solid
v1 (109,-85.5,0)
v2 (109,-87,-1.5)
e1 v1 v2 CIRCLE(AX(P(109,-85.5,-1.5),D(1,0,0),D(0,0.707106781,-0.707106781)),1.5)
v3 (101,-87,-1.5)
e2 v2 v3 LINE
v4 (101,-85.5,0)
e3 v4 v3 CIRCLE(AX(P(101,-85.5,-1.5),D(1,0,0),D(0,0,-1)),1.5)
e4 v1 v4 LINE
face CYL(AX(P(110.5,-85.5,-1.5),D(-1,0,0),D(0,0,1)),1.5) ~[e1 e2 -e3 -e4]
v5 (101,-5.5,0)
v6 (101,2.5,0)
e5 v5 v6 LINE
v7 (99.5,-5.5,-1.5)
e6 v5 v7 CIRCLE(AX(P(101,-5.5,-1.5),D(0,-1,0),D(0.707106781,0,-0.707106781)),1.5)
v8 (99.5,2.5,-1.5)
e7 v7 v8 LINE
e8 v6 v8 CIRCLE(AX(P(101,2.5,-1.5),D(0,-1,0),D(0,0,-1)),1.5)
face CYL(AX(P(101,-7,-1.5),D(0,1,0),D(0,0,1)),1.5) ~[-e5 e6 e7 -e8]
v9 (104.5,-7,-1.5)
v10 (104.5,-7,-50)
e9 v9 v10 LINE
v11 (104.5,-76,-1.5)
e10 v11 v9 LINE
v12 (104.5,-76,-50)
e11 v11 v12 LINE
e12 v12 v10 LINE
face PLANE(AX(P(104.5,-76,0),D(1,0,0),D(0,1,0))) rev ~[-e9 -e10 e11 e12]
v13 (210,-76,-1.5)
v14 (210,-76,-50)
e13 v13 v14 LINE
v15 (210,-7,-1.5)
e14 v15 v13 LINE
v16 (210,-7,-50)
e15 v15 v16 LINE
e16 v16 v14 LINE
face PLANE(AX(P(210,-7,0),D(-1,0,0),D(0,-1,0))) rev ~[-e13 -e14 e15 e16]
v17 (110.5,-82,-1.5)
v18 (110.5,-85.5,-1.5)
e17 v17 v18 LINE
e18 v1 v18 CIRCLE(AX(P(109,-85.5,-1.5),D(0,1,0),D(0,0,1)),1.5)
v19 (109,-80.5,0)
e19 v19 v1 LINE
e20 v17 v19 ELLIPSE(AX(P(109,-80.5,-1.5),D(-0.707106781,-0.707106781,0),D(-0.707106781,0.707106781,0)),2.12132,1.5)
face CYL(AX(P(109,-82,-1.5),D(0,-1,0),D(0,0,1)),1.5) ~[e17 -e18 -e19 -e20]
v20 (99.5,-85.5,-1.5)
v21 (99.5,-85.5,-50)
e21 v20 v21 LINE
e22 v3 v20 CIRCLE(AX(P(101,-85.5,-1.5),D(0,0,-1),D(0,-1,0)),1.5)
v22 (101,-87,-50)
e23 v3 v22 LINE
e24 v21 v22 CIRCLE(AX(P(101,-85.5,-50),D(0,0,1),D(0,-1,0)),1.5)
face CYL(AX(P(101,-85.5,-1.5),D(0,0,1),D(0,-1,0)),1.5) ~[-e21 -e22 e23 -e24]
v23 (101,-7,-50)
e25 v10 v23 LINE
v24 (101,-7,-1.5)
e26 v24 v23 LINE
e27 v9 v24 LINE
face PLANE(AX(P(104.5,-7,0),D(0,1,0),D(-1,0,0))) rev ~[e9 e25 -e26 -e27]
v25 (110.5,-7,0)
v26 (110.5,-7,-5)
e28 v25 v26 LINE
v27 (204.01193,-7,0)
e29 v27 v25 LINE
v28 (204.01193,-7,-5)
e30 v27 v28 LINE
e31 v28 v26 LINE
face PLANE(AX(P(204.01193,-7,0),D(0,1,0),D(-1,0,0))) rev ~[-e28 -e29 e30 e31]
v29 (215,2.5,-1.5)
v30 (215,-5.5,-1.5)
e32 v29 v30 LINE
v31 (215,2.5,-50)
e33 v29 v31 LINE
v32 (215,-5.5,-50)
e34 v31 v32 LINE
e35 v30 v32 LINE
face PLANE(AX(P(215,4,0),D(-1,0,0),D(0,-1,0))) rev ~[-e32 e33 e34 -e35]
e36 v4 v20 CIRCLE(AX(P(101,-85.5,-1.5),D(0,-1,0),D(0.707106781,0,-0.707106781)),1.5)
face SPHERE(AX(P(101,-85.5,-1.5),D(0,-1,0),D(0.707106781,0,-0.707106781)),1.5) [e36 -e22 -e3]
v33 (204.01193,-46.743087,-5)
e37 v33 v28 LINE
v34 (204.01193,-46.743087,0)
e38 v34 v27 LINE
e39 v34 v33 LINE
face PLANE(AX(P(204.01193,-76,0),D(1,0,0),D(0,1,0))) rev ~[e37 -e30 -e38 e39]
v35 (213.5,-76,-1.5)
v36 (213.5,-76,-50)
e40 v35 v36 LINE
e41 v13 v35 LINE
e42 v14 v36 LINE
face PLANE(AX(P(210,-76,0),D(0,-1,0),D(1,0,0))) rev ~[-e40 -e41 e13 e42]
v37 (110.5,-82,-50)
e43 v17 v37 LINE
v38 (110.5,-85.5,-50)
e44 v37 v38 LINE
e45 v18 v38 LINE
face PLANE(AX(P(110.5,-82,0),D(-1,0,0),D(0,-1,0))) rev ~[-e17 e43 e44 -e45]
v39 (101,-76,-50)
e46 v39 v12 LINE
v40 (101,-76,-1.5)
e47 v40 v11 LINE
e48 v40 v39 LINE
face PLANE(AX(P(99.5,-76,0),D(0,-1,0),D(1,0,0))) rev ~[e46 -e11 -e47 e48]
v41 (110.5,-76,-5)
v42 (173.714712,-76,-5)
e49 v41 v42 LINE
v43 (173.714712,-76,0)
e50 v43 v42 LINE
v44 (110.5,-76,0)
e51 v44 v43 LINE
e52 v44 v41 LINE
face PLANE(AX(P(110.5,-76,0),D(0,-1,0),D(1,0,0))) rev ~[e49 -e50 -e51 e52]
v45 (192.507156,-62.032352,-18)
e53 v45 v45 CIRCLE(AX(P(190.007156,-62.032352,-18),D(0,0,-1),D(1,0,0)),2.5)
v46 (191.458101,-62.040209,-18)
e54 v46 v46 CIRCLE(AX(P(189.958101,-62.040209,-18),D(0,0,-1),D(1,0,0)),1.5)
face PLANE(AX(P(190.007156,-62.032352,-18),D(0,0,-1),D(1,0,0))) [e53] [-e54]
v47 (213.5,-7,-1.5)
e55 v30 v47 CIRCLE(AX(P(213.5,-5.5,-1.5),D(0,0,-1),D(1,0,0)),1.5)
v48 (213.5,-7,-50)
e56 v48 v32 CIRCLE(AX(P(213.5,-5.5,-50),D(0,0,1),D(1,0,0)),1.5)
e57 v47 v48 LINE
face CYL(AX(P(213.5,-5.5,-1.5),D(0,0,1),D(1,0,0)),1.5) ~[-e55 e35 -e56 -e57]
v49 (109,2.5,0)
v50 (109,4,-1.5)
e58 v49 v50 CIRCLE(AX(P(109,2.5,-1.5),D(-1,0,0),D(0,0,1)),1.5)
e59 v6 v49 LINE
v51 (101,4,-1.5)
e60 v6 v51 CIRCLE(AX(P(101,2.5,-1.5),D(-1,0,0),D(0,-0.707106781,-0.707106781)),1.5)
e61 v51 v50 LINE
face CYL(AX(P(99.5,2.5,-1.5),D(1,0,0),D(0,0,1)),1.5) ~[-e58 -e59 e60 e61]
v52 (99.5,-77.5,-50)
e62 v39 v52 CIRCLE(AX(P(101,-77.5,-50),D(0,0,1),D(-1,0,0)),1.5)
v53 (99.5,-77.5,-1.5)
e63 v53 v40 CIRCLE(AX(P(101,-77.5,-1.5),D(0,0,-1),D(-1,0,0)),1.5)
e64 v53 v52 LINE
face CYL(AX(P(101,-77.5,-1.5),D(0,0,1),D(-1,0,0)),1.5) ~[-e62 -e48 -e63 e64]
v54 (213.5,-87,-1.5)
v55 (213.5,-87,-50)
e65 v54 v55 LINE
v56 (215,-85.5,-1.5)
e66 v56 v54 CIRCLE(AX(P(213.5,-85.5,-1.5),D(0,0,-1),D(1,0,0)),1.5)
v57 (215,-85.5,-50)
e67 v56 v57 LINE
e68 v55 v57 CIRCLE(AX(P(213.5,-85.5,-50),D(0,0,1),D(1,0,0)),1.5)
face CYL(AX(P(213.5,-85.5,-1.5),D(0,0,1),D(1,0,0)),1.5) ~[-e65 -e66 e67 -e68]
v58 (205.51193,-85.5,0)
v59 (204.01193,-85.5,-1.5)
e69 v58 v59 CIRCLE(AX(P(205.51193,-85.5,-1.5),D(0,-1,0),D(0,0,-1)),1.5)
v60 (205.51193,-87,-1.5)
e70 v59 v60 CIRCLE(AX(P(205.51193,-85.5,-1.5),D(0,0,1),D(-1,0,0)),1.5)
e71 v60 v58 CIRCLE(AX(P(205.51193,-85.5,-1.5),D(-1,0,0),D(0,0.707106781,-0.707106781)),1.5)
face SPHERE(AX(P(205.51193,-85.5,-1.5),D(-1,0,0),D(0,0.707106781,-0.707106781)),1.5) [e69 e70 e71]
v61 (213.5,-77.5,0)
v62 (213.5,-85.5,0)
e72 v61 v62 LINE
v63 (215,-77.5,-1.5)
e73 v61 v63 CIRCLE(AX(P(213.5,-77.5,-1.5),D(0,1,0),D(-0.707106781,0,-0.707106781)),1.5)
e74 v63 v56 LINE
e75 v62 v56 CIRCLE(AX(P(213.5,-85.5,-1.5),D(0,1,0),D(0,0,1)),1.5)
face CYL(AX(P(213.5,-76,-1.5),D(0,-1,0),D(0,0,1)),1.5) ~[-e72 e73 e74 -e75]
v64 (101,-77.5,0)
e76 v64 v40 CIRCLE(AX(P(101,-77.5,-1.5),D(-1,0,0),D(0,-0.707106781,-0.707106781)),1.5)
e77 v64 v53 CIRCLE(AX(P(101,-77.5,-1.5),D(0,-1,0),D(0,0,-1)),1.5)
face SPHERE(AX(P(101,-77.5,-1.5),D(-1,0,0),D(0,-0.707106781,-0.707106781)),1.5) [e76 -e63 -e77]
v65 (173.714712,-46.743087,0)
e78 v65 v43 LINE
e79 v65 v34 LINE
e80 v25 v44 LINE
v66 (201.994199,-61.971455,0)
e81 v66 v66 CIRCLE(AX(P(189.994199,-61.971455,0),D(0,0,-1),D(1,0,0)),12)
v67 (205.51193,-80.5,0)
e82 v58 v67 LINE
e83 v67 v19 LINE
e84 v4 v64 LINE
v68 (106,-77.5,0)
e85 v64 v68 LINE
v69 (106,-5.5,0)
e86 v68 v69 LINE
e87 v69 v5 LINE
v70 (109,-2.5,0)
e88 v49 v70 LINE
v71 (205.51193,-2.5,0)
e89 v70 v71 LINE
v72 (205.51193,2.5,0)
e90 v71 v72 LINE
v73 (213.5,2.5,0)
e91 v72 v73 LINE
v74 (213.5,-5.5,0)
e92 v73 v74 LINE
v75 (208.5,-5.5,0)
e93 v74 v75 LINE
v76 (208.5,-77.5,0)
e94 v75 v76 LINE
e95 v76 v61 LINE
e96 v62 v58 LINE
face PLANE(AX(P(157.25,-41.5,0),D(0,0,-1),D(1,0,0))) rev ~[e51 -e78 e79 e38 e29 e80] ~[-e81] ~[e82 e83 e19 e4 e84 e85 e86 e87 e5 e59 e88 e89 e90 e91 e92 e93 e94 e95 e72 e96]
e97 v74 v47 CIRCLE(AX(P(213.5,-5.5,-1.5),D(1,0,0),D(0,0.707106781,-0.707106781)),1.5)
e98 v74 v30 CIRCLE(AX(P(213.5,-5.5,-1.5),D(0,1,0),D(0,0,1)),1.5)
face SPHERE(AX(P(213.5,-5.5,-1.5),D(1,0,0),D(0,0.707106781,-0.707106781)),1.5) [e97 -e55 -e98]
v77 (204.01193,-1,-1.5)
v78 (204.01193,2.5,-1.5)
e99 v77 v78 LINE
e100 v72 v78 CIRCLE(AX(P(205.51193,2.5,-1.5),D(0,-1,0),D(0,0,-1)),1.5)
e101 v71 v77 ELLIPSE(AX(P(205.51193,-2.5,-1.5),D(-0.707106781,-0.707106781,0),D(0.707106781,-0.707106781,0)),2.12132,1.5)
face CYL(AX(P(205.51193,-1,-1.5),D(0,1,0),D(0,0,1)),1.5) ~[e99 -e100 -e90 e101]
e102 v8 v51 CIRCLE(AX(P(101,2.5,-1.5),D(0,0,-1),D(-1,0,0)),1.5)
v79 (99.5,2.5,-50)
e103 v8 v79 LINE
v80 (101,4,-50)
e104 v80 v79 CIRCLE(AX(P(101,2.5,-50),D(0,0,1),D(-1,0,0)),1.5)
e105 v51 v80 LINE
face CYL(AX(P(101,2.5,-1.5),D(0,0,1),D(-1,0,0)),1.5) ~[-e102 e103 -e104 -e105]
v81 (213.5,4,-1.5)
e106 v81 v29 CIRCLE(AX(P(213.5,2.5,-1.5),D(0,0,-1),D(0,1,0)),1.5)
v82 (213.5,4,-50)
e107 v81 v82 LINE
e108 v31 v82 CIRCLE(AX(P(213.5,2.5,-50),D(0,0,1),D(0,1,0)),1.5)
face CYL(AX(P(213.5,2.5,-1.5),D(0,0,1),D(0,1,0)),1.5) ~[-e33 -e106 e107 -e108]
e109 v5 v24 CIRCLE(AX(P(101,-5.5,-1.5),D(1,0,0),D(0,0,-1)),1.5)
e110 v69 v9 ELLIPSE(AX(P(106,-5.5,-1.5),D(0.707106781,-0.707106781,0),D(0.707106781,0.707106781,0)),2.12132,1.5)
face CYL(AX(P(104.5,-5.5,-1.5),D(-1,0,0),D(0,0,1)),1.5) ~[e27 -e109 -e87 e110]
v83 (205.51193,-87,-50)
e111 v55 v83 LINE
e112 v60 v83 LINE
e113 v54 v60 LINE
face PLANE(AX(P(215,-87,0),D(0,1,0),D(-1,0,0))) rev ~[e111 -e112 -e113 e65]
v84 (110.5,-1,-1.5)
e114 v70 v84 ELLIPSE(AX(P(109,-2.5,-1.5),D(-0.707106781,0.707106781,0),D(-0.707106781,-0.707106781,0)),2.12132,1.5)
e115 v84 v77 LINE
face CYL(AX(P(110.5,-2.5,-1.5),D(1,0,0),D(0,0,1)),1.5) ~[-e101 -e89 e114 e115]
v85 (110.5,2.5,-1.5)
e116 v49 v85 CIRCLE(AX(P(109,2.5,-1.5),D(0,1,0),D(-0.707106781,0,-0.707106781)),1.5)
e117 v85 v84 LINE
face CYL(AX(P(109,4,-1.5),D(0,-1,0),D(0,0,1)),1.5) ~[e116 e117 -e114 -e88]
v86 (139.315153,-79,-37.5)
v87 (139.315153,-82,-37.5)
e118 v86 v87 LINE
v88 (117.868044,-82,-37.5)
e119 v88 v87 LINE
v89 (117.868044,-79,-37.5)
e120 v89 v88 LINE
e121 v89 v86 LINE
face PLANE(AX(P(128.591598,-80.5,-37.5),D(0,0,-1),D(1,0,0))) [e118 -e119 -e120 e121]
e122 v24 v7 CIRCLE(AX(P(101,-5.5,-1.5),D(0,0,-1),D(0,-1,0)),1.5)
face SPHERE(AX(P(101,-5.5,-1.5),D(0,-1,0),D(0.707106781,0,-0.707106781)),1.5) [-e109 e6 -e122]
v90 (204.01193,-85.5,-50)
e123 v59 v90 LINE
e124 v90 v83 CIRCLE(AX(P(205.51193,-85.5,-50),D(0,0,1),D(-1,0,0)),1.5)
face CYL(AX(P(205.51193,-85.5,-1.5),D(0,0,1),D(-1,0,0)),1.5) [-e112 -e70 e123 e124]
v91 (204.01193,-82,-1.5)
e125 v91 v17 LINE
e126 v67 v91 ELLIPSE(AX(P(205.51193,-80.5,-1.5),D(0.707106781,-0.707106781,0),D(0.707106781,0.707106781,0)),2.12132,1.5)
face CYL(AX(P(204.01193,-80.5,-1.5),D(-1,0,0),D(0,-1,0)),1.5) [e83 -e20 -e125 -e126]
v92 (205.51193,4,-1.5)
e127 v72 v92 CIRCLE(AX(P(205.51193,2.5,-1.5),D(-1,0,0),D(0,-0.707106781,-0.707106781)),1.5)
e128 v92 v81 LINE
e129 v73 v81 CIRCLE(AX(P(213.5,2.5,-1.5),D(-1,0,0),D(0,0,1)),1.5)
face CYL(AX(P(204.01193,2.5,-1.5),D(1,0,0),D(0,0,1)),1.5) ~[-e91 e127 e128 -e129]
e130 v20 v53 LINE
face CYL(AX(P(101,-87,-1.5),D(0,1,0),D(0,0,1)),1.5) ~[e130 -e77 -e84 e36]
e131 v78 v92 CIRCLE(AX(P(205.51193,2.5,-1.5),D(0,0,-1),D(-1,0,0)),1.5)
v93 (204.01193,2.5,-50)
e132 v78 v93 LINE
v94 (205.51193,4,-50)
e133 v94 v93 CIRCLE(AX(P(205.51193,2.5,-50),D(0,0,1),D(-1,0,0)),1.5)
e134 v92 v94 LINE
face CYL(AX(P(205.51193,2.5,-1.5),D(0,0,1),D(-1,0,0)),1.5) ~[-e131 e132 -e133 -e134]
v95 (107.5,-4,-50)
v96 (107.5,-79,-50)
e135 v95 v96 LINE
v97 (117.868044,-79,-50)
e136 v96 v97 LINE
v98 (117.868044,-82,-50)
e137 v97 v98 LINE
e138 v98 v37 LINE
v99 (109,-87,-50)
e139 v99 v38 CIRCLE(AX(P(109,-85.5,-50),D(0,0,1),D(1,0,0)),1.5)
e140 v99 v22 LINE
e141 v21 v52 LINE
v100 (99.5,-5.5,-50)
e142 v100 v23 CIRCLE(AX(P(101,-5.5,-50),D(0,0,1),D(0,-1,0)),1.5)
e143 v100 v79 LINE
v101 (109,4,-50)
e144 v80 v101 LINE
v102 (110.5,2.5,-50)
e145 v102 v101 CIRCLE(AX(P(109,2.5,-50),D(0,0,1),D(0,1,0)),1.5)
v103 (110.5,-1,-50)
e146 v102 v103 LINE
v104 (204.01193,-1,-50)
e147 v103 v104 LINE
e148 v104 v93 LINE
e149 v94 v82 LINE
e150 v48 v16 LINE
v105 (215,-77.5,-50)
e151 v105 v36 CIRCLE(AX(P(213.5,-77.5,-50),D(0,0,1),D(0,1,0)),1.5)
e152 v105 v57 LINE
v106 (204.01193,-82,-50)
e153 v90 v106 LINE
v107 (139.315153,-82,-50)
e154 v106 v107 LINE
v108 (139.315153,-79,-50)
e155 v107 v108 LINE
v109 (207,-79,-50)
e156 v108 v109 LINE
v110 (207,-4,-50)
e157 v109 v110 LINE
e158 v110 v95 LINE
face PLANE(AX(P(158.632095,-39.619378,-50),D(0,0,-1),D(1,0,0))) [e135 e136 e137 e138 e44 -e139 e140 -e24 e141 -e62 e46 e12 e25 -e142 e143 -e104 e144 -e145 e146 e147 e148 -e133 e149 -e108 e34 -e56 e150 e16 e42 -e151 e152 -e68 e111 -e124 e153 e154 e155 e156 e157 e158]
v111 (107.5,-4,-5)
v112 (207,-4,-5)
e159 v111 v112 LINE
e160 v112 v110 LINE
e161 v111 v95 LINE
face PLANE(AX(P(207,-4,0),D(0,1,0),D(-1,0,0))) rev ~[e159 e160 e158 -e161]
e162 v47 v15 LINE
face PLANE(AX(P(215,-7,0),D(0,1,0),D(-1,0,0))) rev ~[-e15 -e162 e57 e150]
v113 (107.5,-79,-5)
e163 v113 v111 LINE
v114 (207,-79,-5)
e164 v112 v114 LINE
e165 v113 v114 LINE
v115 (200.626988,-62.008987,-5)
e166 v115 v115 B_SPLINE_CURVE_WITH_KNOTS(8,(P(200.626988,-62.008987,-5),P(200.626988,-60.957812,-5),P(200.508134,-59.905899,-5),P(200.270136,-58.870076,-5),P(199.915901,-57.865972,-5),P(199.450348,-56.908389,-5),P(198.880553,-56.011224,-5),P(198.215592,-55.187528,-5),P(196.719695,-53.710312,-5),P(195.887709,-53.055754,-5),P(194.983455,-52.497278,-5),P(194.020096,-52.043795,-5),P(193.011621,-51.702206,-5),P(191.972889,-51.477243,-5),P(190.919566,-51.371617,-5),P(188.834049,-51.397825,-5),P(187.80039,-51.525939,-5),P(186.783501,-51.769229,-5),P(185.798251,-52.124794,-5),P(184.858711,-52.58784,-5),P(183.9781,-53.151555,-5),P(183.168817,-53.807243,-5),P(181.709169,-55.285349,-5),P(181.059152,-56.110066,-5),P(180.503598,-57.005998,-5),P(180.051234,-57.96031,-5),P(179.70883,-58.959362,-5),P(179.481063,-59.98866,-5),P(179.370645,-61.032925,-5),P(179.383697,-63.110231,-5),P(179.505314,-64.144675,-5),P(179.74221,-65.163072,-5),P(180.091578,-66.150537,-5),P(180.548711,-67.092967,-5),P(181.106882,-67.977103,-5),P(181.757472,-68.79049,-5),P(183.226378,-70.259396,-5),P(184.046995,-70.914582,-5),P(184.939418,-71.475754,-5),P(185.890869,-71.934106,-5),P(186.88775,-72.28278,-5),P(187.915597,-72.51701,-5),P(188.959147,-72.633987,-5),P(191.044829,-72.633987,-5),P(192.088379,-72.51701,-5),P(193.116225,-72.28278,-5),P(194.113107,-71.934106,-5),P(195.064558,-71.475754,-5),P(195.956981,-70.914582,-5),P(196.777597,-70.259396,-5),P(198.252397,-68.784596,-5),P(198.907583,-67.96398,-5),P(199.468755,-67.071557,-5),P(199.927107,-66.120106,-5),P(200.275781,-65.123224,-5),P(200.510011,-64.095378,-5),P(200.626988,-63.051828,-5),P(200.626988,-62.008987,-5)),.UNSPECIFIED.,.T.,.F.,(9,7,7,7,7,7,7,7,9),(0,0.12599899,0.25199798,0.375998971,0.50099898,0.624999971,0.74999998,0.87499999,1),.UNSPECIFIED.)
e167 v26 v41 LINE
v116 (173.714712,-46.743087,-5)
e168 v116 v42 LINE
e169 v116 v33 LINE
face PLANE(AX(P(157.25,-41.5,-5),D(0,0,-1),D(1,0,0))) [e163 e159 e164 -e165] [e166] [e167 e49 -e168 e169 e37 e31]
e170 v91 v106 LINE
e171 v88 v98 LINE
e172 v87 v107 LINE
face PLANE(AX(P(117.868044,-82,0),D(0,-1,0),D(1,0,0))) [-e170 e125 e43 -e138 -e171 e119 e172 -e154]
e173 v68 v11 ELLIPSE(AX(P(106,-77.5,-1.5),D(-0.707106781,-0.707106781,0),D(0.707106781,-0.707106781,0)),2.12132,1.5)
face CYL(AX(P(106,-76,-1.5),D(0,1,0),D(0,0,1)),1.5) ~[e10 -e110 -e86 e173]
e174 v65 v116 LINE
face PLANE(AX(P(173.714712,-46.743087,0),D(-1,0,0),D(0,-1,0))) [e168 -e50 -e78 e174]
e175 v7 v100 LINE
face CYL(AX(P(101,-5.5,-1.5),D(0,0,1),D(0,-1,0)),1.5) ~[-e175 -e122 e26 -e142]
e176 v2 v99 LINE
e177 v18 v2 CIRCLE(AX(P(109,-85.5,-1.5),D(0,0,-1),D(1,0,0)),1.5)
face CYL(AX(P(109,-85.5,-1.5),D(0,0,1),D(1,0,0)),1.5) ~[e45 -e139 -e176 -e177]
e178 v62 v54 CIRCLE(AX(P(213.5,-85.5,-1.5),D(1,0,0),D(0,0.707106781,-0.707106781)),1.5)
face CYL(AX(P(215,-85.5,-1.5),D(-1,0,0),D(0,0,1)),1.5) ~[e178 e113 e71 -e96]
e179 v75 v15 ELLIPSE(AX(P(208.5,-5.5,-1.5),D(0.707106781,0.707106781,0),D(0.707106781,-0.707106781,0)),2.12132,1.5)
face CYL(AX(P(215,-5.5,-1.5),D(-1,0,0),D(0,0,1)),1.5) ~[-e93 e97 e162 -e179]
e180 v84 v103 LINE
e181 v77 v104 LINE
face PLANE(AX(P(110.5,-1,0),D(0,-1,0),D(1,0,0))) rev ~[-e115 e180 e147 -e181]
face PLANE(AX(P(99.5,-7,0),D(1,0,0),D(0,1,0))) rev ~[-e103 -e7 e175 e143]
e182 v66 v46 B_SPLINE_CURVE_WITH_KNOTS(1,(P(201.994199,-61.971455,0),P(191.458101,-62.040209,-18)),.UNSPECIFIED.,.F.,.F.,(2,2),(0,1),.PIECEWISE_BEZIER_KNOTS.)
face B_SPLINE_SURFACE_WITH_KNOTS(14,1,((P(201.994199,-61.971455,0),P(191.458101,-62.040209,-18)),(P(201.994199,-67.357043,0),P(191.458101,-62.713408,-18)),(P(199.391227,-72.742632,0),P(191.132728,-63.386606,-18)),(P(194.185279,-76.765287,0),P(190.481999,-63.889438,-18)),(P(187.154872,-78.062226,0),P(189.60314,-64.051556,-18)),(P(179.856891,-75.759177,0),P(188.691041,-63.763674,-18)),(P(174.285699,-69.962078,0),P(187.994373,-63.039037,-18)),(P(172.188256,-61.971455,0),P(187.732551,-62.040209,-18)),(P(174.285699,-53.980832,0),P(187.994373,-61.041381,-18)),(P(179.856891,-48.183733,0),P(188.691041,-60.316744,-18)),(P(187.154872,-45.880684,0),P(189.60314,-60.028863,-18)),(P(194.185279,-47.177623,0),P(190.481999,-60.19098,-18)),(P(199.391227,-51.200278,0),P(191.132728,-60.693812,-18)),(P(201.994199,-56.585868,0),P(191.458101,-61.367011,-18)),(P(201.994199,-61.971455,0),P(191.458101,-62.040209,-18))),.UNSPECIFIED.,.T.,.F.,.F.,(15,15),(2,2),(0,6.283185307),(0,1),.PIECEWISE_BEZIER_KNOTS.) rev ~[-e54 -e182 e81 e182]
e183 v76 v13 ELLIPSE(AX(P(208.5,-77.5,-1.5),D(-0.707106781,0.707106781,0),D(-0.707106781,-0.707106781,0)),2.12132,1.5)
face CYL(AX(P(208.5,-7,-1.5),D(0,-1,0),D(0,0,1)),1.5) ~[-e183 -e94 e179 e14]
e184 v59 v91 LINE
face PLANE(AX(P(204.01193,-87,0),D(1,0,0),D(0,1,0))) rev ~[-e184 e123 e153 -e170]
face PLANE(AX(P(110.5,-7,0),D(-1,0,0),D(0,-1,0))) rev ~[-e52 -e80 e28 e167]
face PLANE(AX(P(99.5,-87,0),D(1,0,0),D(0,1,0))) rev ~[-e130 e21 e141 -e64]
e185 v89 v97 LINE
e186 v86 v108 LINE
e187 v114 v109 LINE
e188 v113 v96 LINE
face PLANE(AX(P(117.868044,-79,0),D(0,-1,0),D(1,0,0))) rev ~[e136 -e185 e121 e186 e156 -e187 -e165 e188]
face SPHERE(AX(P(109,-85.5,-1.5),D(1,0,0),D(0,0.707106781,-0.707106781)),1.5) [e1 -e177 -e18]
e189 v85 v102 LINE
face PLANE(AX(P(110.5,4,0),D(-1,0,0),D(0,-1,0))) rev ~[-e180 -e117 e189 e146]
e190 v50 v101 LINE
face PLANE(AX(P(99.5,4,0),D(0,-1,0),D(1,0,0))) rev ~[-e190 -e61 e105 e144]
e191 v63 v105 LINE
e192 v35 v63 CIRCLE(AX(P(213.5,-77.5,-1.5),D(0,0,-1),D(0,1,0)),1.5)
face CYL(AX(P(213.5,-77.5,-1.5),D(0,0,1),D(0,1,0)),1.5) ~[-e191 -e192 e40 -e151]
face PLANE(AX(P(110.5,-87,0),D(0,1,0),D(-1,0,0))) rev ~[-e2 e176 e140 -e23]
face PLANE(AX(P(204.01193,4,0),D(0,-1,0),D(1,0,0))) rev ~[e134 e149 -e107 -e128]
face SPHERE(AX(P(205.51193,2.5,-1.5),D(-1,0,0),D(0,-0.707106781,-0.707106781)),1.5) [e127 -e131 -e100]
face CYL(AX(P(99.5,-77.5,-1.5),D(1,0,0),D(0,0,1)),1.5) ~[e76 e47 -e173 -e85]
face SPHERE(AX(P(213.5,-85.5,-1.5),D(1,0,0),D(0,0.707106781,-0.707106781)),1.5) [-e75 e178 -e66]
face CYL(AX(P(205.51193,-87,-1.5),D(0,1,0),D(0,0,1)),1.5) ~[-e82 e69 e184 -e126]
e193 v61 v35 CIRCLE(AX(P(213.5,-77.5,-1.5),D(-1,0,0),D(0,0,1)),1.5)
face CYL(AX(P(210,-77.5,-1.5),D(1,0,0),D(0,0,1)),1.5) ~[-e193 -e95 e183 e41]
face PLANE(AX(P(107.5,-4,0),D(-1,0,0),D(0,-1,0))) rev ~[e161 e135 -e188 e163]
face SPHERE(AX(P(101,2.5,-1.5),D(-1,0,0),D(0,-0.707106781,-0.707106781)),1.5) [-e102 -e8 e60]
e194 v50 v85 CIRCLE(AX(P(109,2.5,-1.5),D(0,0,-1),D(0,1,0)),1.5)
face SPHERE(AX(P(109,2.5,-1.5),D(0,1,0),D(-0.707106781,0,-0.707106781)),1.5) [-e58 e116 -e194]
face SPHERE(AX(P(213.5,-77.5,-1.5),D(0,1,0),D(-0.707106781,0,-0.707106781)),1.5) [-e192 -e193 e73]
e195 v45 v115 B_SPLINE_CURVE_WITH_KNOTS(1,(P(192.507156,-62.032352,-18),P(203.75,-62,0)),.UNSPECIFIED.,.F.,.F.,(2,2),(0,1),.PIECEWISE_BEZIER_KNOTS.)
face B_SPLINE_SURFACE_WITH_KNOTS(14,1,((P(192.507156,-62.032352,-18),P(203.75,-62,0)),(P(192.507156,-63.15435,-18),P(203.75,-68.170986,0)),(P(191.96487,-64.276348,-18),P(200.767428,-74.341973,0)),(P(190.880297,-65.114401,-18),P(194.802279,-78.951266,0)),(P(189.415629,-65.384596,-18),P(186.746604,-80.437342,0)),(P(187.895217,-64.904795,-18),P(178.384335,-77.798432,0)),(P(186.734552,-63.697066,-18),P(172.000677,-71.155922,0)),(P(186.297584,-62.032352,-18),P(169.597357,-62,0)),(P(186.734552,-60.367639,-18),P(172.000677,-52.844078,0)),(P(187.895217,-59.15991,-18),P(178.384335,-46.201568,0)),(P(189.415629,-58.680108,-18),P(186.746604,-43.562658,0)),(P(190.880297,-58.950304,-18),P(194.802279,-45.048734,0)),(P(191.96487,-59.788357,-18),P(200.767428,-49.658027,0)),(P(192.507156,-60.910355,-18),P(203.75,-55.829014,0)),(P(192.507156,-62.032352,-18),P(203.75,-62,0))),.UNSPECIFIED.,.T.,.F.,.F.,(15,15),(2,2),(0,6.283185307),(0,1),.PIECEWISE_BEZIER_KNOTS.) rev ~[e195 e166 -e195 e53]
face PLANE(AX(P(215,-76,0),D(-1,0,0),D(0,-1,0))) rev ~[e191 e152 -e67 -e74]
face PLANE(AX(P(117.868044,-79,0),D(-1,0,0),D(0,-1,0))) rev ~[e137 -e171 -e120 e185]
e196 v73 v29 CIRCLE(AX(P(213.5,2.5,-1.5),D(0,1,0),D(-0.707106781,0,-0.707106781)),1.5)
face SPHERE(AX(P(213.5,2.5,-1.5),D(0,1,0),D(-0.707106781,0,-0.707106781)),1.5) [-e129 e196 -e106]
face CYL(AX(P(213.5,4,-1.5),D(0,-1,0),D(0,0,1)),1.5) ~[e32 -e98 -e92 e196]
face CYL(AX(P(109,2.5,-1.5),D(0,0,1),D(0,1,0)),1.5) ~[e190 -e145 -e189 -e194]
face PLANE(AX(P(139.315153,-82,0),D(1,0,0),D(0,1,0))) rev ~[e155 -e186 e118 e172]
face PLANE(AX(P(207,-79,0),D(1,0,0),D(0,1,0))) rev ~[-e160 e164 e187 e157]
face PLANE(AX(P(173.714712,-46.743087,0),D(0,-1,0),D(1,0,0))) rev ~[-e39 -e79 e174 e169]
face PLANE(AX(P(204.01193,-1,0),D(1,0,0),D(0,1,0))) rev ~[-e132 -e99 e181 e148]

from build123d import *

# Parameters (mm, degrees)
F0_W          = 60.594435811
F0_H          = 58.5138263702
F0_R          = 27.5
F3_DEPTH      = 10
F4_R          = 5
F6_R          = 24
F7_R          = 3
F9_DEPTH      = 10
F10_DEPTH     = 100
F0_W_2        = 42.894218117
F0_H_2        = 6
F11_DEPTH     = 75
F12_R         = 3
F13_T1_DEPTH  = 104.5
F13_S5_W      = 3
F13_S5_H      = 3
F13_T6_DEPTH  = 3
F13_S11_W     = 3
F13_S11_H     = 3
F13_T12_DEPTH = 3
F13_S17_W     = 3
F13_S17_H     = 3
F13_T18_DEPTH = 3
F13_S23_W     = 3
F13_S23_H     = 3
F13_T24_DEPTH = 3
F13_S29_W     = 3
F13_S29_H     = 3
F13_T30_DEPTH = 3
F13_S35_W     = 3
F13_S35_H     = 3
F13_T36_DEPTH = 3
F13_S41_W     = 3
F13_S41_H     = 3
F13_T42_DEPTH = 3
F13_S47_W     = 3
F13_S47_H     = 3
F13_T48_DEPTH = 3
F13_S53_W     = 3
F13_S53_H     = 3
F13_T54_DEPTH = 3
F13_S59_W     = 3
F13_S59_H     = 3
F13_T60_DEPTH = 3
F13_S65_W     = 3
F13_S65_H     = 3
F13_T66_DEPTH = 3
F13_S71_W     = 3
F13_S71_H     = 3
F13_T72_DEPTH = 3
F14_SCALE     = 0.5
F15_ANGLE     = 180


# Not quite as in the source:
# - a fillet or chamfer that OpenCascade refuses, or shapes differently, is made with other operations: its cross-section is extruded or revolved along the edge and cut away or added


with BuildPart() as f3:
    # F0 (on Top) → F3 (new body)
    with BuildSketch(Plane.XY):
        with Locations((162.7266414762, 114.7430868149)):
            Rectangle(F0_W, F0_H)
        with Locations((165, 116)):
            Circle(F0_R, mode=Mode.SUBTRACT)
        with Locations((165, 116)):
            Circle(F0_R)
    extrude(amount=F3_DEPTH)

    # F4 (on offset) → F5 section 0
    with BuildSketch(Plane.XY.offset(36)):
        with Locations((165.0143116713, 116.0647049546)):
            Circle(F4_R)
    # F0 (on Top) → F5 section 1
    with BuildSketch(Plane.XY):
        with Locations((165, 116)):
            Circle(F0_R)
    loft()

    # F6 (on Top) → F8 section 0
    with BuildSketch(Plane.XY):
        with Locations((164.9883985519, 115.9429103136)):
            Circle(F6_R)
    # F7 (on offset) → F8 section 1
    with BuildSketch(Plane.XY.offset(36)):
        with Locations((164.916202426, 116.0804182291)):
            Circle(F7_R)
    loft(mode=Mode.SUBTRACT)

    # F0 (on Top) → F9 (join)
    with BuildSketch(Plane.XY):
        Polygon((0, 150), (0, 0), (199, 0), (199, 150), (63.6303052306, 150), (20.7360871136, 150), align=None)
        Polygon((193.0238593817, 6), (6, 6), (6, 144), (132.4294235706, 144), (193.0238593817, 144), (193.0238593817, 85.4861736298), align=None, mode=Mode.SUBTRACT)
    extrude(amount=F9_DEPTH)

    # F0 (on Top) → F10 (join)
    with BuildSketch(Plane.XY):
        Polygon((199, 0), (0, 0), (0, 150), (20.7360871136, 150), (20.7360871136, 156), (6, 156), (6, 166), (-16, 166), (-16, 144), (-6, 144), (-6, 6), (-16, 6), (-16, -16), (6, -16), (6, -6), (193.0238593817, -6), (193.0238593817, -16), (215, -16), (215, 6), (205, 6), (205, 144), (215, 144), (215, 166), (193.0238593817, 166), (193.0238593817, 156), (63.6303052306, 156), (63.6303052306, 150), (199, 150), align=None)
    extrude(amount=F10_DEPTH)

    # F0 (on Top) → F11 (join)
    with BuildSketch(Plane.XY):
        with Locations((42.1831961721, 153)):
            Rectangle(F0_W_2, F0_H_2)
    extrude(amount=F11_DEPTH)

    # F12
    f12_edges = [f3.edges().sort_by_distance(p)[0] for p in [
        (204.01193, -16, 0),
        (215, -5, 0),
        (205, 75, 0),
        (210, 6, 0),
        (210, 144, 0),
        (215, 155, 0),
        (204.01193, 166, 0),
        (193.023859, 161, 0),
        (99.51193, 156, 0),
        (-5, 166, 0),
        (6, 161, 0),
        (-16, 155, 0),
        (-11, 144, 0),
        (-6, 75, 0),
        (-11, 6, 0),
        (-5, -16, 0),
        (-16, -5, 0),
        (6, -11, 0),
        (99.51193, -6, 0),
        (193.023859, -11, 0),
    ]]
    fillet(f12_edges, radius=F12_R)

    # F13: fillet of radius 3 on 12 edges, made by hand

    # F13_s2 → F13_t1 (cut)
    with BuildSketch(Plane.XY.offset(3)):
        with BuildLine():
            ThreePointArc((212, -16), (214.1213203436, -15.1213203436), (215, -13))
            Line((215, -13), (215, -16))
            Line((215, -16), (212, -16))
        make_face()
        with BuildLine():
            ThreePointArc((193.0238593817, -13), (193.9025390381, -15.1213203436), (196.0238593817, -16))
            Line((196.0238593817, -16), (193.0238593817, -16))
            Line((193.0238593817, -16), (193.0238593817, -13))
        make_face()
        with BuildLine():
            ThreePointArc((215, 3), (214.1213203436, 5.1213203436), (212, 6))
            Line((212, 6), (215, 6))
            Line((215, 6), (215, 3))
        make_face()
        with BuildLine():
            ThreePointArc((212, 144), (214.1213203436, 144.8786796564), (215, 147))
            Line((215, 147), (215, 144))
            Line((215, 144), (212, 144))
        make_face()
        with BuildLine():
            ThreePointArc((215, 163), (214.1213203436, 165.1213203436), (212, 166))
            Line((212, 166), (215, 166))
            Line((215, 166), (215, 163))
        make_face()
        with BuildLine():
            ThreePointArc((193.0238593817, 163), (193.9025390381, 165.1213203436), (196.0238593817, 166))
            Line((196.0238593817, 166), (193.0238593817, 166))
            Line((193.0238593817, 166), (193.0238593817, 163))
        make_face()
        with BuildLine():
            ThreePointArc((3, -16), (5.1213203436, -15.1213203436), (6, -13))
            Line((6, -13), (6, -16))
            Line((6, -16), (3, -16))
        make_face()
        with BuildLine():
            ThreePointArc((-16, -13), (-15.1213203436, -15.1213203436), (-13, -16))
            Line((-13, -16), (-16, -16))
            Line((-16, -16), (-16, -13))
        make_face()
        with BuildLine():
            ThreePointArc((-13, 6), (-15.1213203436, 5.1213203436), (-16, 3))
            Line((-16, 3), (-16, 6))
            Line((-16, 6), (-13, 6))
        make_face()
        with BuildLine():
            ThreePointArc((-16, 147), (-15.1213203436, 144.8786796564), (-13, 144))
            Line((-13, 144), (-16, 144))
            Line((-16, 144), (-16, 147))
        make_face()
        with BuildLine():
            ThreePointArc((-13, 166), (-15.1213203436, 165.1213203436), (-16, 163))
            Line((-16, 163), (-16, 166))
            Line((-16, 166), (-13, 166))
        make_face()
        with BuildLine():
            ThreePointArc((6, 163), (5.1213203436, 165.1213203436), (3, 166))
            Line((3, 166), (6, 166))
            Line((6, 166), (6, 163))
        make_face()
    extrude(amount=F13_T1_DEPTH, mode=Mode.SUBTRACT)


with BuildPart() as f13_tool4:
    # F13_s5 → F13_t6 (new body)
    with BuildSketch(Plane.YZ.offset(3)):
        with Locations((164.5, 1.5)):
            Rectangle(F13_S5_W, F13_S5_H)
    extrude(amount=F13_T6_DEPTH)

    # F13_s7 → F13_t8 (revolve, cut)
    with BuildSketch(Plane(origin=(3, 163, 3), x_dir=(0, -0.7071067812, 0.7071067812), z_dir=(0, 0.7071067812, 0.7071067812))):
        with BuildLine():
            ThreePointArc((0, -3), (3, 0), (0, 3))
            Line((0, 3), (0, -3))
        make_face()
    revolve(axis=Axis((3, 163, 3), (1, 0, 0)), mode=Mode.SUBTRACT)


with BuildPart() as f3_1:
    add(f3.part)

    # F13_t3: cut F13_tool4
    add(f13_tool4.part, mode=Mode.SUBTRACT)


with BuildPart() as f13_tool10:
    # F13_s11 → F13_t12 (new body)
    with BuildSketch(Plane.XZ.offset(-163)):
        with Locations((-14.5, 1.5)):
            Rectangle(F13_S11_W, F13_S11_H)
    extrude(amount=-F13_T12_DEPTH)

    # F13_s13 → F13_t14 (revolve, cut)
    with BuildSketch(Plane(origin=(-13, 163, 3), x_dir=(0.7071067812, 0, 0.7071067812), z_dir=(-0.7071067812, 0, 0.7071067812))):
        with BuildLine():
            ThreePointArc((0, -3), (3, 0), (0, 3))
            Line((0, 3), (0, -3))
        make_face()
    revolve(axis=Axis((-13, 163, 3), (0, 1, 0)), mode=Mode.SUBTRACT)


with BuildPart() as f3_2:
    add(f3_1.part)

    # F13_t9: cut F13_tool10
    add(f13_tool10.part, mode=Mode.SUBTRACT)


with BuildPart() as f13_tool16:
    # F13_s17 → F13_t18 (new body)
    with BuildSketch(Plane.YZ.offset(-13)):
        with Locations((145.5, 1.5)):
            Rectangle(F13_S17_W, F13_S17_H)
    extrude(amount=-F13_T18_DEPTH)

    # F13_s19 → F13_t20 (revolve, cut)
    with BuildSketch(Plane(origin=(-13, 147, 3), x_dir=(0, 0.7071067812, 0.7071067812), z_dir=(0, -0.7071067812, 0.7071067812))):
        with BuildLine():
            ThreePointArc((0, -3), (3, 0), (0, 3))
            Line((0, 3), (0, -3))
        make_face()
    revolve(axis=Axis((-13, 147, 3), (-1, 0, 0)), mode=Mode.SUBTRACT)


with BuildPart() as f3_3:
    add(f3_2.part)

    # F13_t15: cut F13_tool16
    add(f13_tool16.part, mode=Mode.SUBTRACT)


with BuildPart() as f13_tool22:
    # F13_s23 → F13_t24 (new body)
    with BuildSketch(Plane.XZ.offset(-3)):
        with Locations((-14.5, 1.5)):
            Rectangle(F13_S23_W, F13_S23_H)
    extrude(amount=-F13_T24_DEPTH)

    # F13_s25 → F13_t26 (revolve, cut)
    with BuildSketch(Plane(origin=(-13, 3, 3), x_dir=(0.7071067812, 0, 0.7071067812), z_dir=(-0.7071067812, 0, 0.7071067812))):
        with BuildLine():
            ThreePointArc((0, -3), (3, 0), (0, 3))
            Line((0, 3), (0, -3))
        make_face()
    revolve(axis=Axis((-13, 3, 3), (0, 1, 0)), mode=Mode.SUBTRACT)


with BuildPart() as f3_4:
    add(f3_3.part)

    # F13_t21: cut F13_tool22
    add(f13_tool22.part, mode=Mode.SUBTRACT)


with BuildPart() as f13_tool28:
    # F13_s29 → F13_t30 (new body)
    with BuildSketch(Plane.YZ.offset(-13)):
        with Locations((-14.5, 1.5)):
            Rectangle(F13_S29_W, F13_S29_H)
    extrude(amount=-F13_T30_DEPTH)

    # F13_s31 → F13_t32 (revolve, cut)
    with BuildSketch(Plane(origin=(-13, -13, 3), x_dir=(0, 0.7071067812, 0.7071067812), z_dir=(0, -0.7071067812, 0.7071067812))):
        with BuildLine():
            ThreePointArc((0, -3), (3, 0), (0, 3))
            Line((0, 3), (0, -3))
        make_face()
    revolve(axis=Axis((-13, -13, 3), (-1, 0, 0)), mode=Mode.SUBTRACT)


with BuildPart() as f3_5:
    add(f3_4.part)

    # F13_t27: cut F13_tool28
    add(f13_tool28.part, mode=Mode.SUBTRACT)


with BuildPart() as f13_tool34:
    # F13_s35 → F13_t36 (new body)
    with BuildSketch(Plane.XZ.offset(13)):
        with Locations((4.5, 1.5)):
            Rectangle(F13_S35_W, F13_S35_H)
    extrude(amount=F13_T36_DEPTH)

    # F13_s37 → F13_t38 (revolve, cut)
    with BuildSketch(Plane(origin=(3, -13, 3), x_dir=(-0.7071067812, 0, 0.7071067812), z_dir=(0.7071067812, 0, 0.7071067812))):
        with BuildLine():
            ThreePointArc((0, -3), (3, 0), (0, 3))
            Line((0, 3), (0, -3))
        make_face()
    revolve(axis=Axis((3, -13, 3), (0, -1, 0)), mode=Mode.SUBTRACT)


with BuildPart() as f3_6:
    add(f3_5.part)

    # F13_t33: cut F13_tool34
    add(f13_tool34.part, mode=Mode.SUBTRACT)


with BuildPart() as f13_tool40:
    # F13_s41 → F13_t42 (new body)
    with BuildSketch(Plane.YZ.offset(196.0238593817)):
        with Locations((164.5, 1.5)):
            Rectangle(F13_S41_W, F13_S41_H)
    extrude(amount=-F13_T42_DEPTH)

    # F13_s43 → F13_t44 (revolve, cut)
    with BuildSketch(Plane(origin=(196.0238593817, 163, 3), x_dir=(0, -0.7071067812, 0.7071067812), z_dir=(0, -0.7071067812, -0.7071067812))):
        with BuildLine():
            ThreePointArc((0, -3), (3, 0), (0, 3))
            Line((0, 3), (0, -3))
        make_face()
    revolve(axis=Axis((196.0238593817, 163, 3), (-1, 0, 0)), mode=Mode.SUBTRACT)


with BuildPart() as f3_7:
    add(f3_6.part)

    # F13_t39: cut F13_tool40
    add(f13_tool40.part, mode=Mode.SUBTRACT)


with BuildPart() as f13_tool46:
    # F13_s47 → F13_t48 (new body)
    with BuildSketch(Plane.YZ.offset(212)):
        with Locations((164.5, 1.5)):
            Rectangle(F13_S47_W, F13_S47_H)
    extrude(amount=F13_T48_DEPTH)

    # F13_s49 → F13_t50 (revolve, cut)
    with BuildSketch(Plane(origin=(212, 163, 3), x_dir=(0, -0.7071067812, 0.7071067812), z_dir=(0, 0.7071067812, 0.7071067812))):
        with BuildLine():
            ThreePointArc((0, -3), (3, 0), (0, 3))
            Line((0, 3), (0, -3))
        make_face()
    revolve(axis=Axis((212, 163, 3), (1, 0, 0)), mode=Mode.SUBTRACT)


with BuildPart() as f3_8:
    add(f3_7.part)

    # F13_t45: cut F13_tool46
    add(f13_tool46.part, mode=Mode.SUBTRACT)


with BuildPart() as f13_tool52:
    # F13_s53 → F13_t54 (new body)
    with BuildSketch(Plane.XZ.offset(-147)):
        with Locations((213.5, 1.5)):
            Rectangle(F13_S53_W, F13_S53_H)
    extrude(amount=F13_T54_DEPTH)

    # F13_s55 → F13_t56 (revolve, cut)
    with BuildSketch(Plane(origin=(212, 147, 3), x_dir=(-0.7071067812, 0, 0.7071067812), z_dir=(0.7071067812, 0, 0.7071067812))):
        with BuildLine():
            ThreePointArc((0, -3), (3, 0), (0, 3))
            Line((0, 3), (0, -3))
        make_face()
    revolve(axis=Axis((212, 147, 3), (0, -1, 0)), mode=Mode.SUBTRACT)


with BuildPart() as f3_9:
    add(f3_8.part)

    # F13_t51: cut F13_tool52
    add(f13_tool52.part, mode=Mode.SUBTRACT)


with BuildPart() as f13_tool58:
    # F13_s59 → F13_t60 (new body)
    with BuildSketch(Plane.YZ.offset(212)):
        with Locations((4.5, 1.5)):
            Rectangle(F13_S59_W, F13_S59_H)
    extrude(amount=F13_T60_DEPTH)

    # F13_s61 → F13_t62 (revolve, cut)
    with BuildSketch(Plane(origin=(212, 3, 3), x_dir=(0, -0.7071067812, 0.7071067812), z_dir=(0, 0.7071067812, 0.7071067812))):
        with BuildLine():
            ThreePointArc((0, -3), (3, 0), (0, 3))
            Line((0, 3), (0, -3))
        make_face()
    revolve(axis=Axis((212, 3, 3), (1, 0, 0)), mode=Mode.SUBTRACT)


with BuildPart() as f3_10:
    add(f3_9.part)

    # F13_t57: cut F13_tool58
    add(f13_tool58.part, mode=Mode.SUBTRACT)


with BuildPart() as f13_tool64:
    # F13_s65 → F13_t66 (new body)
    with BuildSketch(Plane.YZ.offset(196.0238593817)):
        with Locations((-14.5, 1.5)):
            Rectangle(F13_S65_W, F13_S65_H)
    extrude(amount=-F13_T66_DEPTH)

    # F13_s67 → F13_t68 (revolve, cut)
    with BuildSketch(Plane(origin=(196.0238593817, -13, 3), x_dir=(0, 0.7071067812, 0.7071067812), z_dir=(0, -0.7071067812, 0.7071067812))):
        with BuildLine():
            ThreePointArc((0, -3), (3, 0), (0, 3))
            Line((0, 3), (0, -3))
        make_face()
    revolve(axis=Axis((196.0238593817, -13, 3), (-1, 0, 0)), mode=Mode.SUBTRACT)


with BuildPart() as f3_11:
    add(f3_10.part)

    # F13_t63: cut F13_tool64
    add(f13_tool64.part, mode=Mode.SUBTRACT)


with BuildPart() as f13_tool70:
    # F13_s71 → F13_t72 (new body)
    with BuildSketch(Plane.XZ.offset(13)):
        with Locations((213.5, 1.5)):
            Rectangle(F13_S71_W, F13_S71_H)
    extrude(amount=F13_T72_DEPTH)

    # F13_s73 → F13_t74 (revolve, cut)
    with BuildSketch(Plane(origin=(212, -13, 3), x_dir=(-0.7071067812, 0, 0.7071067812), z_dir=(0.7071067812, 0, 0.7071067812))):
        with BuildLine():
            ThreePointArc((0, -3), (3, 0), (0, 3))
            Line((0, 3), (0, -3))
        make_face()
    revolve(axis=Axis((212, -13, 3), (0, -1, 0)), mode=Mode.SUBTRACT)


with BuildPart() as f3_12:
    add(f3_11.part)

    # F13_t69: cut F13_tool70
    add(f13_tool70.part, mode=Mode.SUBTRACT)


with BuildPart() as f3_13:
    # F14: moved
    add(f3_12.part.scale(F14_SCALE).moved(Location((107.5, -8, 0))))


with BuildPart() as f3_14:
    # F15: moved
    add(f3_13.part.rotate(Axis((99.5119296908, -6, 0), (1, 0, 0)), F15_ANGLE))


solid = f3_14.part
